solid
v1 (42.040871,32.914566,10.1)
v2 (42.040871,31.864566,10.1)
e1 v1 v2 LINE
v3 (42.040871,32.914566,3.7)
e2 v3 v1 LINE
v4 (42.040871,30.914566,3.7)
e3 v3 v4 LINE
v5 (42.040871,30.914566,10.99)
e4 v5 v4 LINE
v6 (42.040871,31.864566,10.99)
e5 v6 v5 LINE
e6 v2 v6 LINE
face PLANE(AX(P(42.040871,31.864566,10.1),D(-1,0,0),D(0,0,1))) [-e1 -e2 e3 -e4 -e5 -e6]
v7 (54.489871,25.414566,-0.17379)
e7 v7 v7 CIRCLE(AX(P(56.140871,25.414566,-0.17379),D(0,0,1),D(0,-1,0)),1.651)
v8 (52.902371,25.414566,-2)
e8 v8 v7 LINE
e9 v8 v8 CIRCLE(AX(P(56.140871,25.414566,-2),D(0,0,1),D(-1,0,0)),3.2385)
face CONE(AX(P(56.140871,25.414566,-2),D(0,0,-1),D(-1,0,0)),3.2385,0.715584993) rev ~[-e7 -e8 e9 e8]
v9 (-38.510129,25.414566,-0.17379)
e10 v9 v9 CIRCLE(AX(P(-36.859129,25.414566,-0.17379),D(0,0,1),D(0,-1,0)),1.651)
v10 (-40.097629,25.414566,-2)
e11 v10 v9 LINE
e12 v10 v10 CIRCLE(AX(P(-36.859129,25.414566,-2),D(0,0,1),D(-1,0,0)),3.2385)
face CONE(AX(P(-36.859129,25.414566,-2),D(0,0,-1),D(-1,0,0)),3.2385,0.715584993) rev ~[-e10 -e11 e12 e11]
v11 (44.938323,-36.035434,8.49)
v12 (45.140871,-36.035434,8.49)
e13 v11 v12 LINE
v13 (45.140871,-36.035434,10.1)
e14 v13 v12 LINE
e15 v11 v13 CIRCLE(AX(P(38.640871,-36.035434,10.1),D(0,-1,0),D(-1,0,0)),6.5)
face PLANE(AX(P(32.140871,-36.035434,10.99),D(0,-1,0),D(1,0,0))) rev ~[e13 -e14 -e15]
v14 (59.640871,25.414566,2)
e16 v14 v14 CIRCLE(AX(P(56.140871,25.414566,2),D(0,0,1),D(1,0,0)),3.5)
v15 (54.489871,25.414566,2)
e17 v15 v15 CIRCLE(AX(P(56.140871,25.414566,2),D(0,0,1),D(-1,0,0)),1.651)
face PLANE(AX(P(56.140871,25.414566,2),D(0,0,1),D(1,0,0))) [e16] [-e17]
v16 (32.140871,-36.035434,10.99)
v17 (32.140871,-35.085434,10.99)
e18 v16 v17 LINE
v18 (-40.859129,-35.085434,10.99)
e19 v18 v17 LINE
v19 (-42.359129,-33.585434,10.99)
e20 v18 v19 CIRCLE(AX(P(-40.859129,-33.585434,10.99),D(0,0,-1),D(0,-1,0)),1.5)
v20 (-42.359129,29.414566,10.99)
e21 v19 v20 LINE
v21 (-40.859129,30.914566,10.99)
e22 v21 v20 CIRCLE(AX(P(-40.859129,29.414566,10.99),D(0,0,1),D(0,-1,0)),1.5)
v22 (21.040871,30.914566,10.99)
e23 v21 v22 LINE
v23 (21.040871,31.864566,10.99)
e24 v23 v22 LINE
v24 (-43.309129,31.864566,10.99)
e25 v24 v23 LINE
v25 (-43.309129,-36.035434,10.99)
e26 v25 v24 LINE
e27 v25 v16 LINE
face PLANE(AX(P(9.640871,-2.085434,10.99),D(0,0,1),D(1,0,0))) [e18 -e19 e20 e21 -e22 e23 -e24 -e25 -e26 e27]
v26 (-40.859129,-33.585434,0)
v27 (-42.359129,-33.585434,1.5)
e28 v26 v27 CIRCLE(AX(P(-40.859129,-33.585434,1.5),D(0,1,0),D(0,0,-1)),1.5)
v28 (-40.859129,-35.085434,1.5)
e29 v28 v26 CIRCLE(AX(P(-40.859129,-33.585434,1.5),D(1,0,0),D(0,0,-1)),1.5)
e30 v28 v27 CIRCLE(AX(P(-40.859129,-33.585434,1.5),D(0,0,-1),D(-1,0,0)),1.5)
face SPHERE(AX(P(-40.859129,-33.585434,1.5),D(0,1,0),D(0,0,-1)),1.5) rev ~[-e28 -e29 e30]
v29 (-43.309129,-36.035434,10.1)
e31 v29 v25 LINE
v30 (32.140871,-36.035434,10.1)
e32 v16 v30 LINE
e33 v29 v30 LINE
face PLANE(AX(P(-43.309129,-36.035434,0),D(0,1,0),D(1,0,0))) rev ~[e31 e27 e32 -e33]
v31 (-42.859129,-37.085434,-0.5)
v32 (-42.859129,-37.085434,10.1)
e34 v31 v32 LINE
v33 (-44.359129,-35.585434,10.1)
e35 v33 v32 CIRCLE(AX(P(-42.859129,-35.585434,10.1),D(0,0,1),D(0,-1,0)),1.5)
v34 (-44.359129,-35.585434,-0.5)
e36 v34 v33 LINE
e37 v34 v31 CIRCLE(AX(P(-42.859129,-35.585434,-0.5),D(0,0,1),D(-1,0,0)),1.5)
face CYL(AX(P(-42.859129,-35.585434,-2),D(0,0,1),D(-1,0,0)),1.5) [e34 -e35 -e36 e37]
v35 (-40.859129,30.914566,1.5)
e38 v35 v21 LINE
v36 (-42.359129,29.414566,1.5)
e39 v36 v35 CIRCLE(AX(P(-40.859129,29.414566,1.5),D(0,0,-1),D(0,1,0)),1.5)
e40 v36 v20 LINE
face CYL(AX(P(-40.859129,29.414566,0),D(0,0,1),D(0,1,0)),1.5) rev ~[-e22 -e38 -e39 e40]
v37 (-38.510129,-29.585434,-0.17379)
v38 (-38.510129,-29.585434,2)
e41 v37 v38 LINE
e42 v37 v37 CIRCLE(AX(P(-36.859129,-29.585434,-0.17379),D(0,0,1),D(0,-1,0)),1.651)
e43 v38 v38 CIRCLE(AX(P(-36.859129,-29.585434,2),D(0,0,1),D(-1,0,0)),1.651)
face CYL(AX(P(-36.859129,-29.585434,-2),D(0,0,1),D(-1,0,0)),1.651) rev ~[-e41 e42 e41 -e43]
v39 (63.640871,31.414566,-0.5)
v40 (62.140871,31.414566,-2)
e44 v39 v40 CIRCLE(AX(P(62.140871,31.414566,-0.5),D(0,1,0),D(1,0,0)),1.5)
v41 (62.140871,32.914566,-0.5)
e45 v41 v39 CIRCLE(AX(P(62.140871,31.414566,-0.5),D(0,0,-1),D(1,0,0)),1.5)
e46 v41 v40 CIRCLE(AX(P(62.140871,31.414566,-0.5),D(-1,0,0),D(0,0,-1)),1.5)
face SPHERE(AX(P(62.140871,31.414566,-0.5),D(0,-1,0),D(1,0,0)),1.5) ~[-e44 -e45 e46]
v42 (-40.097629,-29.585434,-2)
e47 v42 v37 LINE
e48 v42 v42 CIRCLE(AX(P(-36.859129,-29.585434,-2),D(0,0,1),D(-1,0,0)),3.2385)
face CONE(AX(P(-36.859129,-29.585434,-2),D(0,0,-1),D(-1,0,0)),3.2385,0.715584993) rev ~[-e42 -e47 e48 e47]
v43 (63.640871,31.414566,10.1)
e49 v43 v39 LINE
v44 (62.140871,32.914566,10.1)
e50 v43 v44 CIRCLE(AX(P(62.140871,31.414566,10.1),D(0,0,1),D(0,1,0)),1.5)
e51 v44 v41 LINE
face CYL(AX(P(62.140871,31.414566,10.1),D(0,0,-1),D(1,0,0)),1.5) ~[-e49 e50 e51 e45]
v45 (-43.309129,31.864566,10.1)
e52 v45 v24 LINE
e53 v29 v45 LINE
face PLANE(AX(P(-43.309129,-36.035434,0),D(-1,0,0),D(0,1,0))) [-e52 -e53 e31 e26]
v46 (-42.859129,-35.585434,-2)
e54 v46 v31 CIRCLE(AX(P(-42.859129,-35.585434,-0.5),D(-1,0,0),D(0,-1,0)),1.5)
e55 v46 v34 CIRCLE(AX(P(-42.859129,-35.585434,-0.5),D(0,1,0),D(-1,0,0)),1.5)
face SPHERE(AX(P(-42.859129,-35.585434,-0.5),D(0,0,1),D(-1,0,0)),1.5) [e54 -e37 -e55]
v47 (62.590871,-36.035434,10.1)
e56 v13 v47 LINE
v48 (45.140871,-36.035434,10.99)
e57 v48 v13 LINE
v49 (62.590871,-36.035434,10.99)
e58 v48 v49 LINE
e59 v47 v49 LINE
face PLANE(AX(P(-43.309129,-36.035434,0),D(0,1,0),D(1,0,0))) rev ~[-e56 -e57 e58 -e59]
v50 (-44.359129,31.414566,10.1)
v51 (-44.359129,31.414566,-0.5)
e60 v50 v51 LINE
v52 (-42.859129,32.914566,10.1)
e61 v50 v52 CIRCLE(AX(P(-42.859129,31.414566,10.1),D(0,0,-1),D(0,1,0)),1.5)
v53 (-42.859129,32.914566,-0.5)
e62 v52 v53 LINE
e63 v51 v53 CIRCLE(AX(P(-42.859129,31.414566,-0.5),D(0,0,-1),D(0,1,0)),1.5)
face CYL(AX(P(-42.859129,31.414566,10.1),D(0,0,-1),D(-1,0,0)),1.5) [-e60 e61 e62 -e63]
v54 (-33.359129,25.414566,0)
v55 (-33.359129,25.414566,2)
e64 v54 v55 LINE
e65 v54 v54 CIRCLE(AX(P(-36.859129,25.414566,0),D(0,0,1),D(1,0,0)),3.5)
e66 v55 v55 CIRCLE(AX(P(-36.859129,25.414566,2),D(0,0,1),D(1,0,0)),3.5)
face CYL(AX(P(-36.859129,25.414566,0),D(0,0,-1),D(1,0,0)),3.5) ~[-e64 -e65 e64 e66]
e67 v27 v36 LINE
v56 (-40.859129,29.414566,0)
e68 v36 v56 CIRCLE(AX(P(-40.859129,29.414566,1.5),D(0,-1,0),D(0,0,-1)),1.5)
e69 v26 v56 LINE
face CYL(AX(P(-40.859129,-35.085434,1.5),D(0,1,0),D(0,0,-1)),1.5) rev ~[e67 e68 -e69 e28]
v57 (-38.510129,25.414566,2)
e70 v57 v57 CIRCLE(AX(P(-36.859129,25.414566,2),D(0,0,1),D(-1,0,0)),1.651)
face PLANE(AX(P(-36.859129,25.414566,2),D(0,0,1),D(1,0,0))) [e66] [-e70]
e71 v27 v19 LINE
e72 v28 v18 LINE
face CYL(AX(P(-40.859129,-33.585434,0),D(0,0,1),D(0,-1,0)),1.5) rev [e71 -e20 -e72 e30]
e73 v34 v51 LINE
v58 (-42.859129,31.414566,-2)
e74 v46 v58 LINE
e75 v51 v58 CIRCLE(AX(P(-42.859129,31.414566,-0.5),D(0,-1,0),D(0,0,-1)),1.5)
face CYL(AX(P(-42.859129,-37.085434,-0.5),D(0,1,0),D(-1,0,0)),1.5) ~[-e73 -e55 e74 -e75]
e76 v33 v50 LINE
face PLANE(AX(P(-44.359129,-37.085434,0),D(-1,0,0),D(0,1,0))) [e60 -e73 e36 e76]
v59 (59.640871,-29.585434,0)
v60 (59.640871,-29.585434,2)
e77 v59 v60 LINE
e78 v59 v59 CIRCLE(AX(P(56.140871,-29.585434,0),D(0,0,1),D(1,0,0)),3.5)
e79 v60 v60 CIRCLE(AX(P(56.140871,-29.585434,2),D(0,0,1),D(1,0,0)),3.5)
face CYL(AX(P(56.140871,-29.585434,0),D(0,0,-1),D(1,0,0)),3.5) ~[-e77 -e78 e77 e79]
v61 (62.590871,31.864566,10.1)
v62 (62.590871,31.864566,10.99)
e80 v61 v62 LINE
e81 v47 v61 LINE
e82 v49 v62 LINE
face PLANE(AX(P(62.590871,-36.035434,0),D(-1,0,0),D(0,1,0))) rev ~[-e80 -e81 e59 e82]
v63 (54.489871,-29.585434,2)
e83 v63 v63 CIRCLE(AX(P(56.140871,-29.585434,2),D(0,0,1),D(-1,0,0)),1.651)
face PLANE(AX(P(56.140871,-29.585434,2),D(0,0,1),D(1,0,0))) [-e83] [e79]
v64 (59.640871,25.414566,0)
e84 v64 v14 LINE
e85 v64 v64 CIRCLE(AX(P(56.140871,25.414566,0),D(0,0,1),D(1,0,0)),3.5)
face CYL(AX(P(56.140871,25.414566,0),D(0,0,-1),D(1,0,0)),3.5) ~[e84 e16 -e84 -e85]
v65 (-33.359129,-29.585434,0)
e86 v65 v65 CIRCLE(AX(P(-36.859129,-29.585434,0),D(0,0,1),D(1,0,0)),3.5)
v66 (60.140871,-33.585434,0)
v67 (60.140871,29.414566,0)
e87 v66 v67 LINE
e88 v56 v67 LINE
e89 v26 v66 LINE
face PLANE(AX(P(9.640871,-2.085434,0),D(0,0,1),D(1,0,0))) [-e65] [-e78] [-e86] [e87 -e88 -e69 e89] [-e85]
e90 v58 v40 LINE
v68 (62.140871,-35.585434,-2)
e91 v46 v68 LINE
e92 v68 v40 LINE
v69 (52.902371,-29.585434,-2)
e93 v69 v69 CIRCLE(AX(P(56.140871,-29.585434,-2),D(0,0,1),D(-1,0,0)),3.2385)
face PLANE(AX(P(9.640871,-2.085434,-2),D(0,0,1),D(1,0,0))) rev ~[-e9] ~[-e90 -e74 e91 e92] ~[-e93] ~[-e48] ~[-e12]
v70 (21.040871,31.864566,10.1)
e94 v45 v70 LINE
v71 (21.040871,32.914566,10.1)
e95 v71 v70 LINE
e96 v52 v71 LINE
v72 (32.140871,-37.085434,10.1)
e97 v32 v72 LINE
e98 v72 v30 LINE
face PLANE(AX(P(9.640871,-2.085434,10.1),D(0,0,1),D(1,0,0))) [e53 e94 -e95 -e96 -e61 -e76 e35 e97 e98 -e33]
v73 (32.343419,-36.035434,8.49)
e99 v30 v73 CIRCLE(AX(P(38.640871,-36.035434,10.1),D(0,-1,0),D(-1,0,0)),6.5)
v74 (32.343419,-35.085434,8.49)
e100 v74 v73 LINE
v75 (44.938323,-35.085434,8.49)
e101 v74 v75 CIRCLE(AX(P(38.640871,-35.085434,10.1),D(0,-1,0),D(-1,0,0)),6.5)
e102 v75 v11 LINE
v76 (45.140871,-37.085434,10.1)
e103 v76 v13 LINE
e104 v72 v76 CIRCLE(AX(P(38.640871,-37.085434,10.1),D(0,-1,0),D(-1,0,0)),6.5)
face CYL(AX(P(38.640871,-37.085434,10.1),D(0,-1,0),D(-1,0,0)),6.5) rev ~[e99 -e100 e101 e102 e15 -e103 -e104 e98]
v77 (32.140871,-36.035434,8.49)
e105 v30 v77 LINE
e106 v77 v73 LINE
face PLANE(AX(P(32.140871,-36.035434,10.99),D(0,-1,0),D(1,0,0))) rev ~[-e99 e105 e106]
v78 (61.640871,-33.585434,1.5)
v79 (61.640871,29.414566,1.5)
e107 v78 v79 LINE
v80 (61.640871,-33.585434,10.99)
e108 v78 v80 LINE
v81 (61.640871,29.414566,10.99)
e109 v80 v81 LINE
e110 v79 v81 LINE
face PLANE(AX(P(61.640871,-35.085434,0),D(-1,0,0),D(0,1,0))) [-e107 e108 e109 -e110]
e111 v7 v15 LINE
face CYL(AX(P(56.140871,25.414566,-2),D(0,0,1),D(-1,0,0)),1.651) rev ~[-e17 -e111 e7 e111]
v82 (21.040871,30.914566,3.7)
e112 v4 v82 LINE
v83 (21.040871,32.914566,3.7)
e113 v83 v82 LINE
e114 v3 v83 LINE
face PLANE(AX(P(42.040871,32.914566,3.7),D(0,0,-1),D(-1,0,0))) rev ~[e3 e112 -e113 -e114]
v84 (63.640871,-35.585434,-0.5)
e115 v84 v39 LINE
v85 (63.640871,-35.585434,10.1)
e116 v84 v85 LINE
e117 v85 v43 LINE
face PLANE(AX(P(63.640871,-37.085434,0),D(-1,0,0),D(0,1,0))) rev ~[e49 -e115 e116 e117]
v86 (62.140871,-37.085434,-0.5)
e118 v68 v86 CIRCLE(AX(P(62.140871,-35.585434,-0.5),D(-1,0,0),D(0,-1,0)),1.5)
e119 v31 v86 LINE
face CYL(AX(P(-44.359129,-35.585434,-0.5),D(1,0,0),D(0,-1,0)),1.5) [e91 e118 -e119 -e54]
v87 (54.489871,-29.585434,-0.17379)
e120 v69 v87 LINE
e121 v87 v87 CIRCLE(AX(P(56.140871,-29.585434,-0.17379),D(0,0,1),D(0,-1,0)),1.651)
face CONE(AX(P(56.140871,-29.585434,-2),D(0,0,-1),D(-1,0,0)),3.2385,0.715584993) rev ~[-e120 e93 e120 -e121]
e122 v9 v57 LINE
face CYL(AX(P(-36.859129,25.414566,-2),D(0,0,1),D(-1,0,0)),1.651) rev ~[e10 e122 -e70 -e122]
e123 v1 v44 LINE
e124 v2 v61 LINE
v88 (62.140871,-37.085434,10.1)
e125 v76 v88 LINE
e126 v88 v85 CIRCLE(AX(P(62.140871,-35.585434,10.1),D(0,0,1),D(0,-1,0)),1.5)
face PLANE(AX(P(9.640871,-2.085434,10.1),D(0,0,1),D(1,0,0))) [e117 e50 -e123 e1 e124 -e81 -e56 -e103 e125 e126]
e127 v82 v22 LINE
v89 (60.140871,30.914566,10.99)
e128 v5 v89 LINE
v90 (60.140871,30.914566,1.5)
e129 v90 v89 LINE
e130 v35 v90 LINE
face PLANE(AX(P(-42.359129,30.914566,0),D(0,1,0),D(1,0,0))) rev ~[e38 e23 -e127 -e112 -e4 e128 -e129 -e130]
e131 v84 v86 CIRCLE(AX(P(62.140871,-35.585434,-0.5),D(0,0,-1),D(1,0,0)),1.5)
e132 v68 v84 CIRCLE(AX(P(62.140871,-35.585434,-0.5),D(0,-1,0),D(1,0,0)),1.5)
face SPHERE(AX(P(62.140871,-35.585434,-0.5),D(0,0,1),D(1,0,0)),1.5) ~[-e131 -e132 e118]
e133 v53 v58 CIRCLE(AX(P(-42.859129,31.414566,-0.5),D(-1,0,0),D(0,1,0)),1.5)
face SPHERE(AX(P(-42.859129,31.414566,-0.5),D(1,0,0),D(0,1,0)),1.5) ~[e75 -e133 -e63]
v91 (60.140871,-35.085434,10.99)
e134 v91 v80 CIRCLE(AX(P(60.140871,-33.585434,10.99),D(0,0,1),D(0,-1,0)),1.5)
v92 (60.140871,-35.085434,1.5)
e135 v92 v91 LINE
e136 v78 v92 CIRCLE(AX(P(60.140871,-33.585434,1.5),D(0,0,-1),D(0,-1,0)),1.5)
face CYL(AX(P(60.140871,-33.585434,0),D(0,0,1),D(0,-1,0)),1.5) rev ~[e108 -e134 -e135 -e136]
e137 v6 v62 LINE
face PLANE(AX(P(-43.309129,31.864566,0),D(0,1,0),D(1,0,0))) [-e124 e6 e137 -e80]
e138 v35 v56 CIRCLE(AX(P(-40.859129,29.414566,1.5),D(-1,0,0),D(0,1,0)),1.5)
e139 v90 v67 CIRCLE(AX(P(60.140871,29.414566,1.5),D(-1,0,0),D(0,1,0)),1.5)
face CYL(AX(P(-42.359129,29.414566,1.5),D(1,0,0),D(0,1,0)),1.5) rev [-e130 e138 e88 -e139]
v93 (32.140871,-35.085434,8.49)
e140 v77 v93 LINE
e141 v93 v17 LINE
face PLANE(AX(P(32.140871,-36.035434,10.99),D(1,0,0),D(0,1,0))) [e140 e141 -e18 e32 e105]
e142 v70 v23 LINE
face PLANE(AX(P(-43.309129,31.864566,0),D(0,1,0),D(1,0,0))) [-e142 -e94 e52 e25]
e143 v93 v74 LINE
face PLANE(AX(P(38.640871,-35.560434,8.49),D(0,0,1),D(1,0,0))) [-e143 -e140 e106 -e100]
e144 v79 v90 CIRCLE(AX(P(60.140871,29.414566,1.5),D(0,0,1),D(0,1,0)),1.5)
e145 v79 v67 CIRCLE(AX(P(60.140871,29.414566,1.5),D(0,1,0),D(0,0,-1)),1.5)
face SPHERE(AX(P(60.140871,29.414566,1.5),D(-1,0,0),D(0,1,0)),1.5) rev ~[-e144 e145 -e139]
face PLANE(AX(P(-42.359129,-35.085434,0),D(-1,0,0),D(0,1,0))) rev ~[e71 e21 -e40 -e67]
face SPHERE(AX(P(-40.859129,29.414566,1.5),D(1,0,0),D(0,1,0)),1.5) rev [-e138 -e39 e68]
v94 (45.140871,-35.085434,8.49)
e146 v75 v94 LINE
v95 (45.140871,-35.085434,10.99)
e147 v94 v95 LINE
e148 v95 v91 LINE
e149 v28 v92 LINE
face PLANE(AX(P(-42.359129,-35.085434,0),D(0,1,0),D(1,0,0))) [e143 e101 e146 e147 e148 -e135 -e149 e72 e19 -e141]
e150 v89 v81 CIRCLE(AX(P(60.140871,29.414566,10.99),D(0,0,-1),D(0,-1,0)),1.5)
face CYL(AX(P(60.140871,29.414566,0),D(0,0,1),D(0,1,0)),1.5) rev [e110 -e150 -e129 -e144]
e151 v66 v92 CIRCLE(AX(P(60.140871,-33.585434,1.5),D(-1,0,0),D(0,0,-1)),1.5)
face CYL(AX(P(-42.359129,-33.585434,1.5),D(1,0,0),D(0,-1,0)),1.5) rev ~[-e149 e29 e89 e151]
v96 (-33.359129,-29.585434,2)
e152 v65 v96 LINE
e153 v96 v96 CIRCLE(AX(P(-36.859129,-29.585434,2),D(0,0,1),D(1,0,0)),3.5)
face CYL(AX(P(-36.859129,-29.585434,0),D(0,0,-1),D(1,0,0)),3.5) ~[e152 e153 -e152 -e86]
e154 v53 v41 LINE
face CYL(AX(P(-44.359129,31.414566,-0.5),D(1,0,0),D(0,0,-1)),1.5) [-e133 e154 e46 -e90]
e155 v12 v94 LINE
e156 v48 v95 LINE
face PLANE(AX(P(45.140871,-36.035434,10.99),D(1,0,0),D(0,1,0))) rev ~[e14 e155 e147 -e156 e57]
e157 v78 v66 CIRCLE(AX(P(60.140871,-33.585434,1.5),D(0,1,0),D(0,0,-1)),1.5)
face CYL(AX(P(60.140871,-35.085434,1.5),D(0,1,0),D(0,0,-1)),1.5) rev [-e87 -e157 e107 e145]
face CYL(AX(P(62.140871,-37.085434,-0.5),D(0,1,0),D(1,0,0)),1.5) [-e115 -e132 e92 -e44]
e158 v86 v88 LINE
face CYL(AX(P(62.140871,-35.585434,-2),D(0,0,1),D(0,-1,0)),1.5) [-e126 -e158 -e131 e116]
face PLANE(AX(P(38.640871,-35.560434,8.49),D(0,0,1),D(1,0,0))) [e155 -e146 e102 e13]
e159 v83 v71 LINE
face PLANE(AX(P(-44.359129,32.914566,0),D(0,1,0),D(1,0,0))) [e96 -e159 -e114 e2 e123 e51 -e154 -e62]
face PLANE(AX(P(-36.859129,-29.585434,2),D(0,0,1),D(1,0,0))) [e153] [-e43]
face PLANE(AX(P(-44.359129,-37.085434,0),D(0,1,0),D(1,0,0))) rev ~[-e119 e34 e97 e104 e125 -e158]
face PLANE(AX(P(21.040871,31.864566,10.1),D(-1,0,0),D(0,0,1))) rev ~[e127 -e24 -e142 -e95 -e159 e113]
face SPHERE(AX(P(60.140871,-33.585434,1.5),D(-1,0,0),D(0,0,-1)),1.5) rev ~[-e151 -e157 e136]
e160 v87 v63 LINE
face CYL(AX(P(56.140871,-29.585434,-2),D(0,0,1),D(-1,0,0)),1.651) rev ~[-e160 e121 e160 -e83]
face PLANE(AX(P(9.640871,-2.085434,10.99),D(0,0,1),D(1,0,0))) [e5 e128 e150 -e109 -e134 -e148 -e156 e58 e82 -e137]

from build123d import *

# Parameters (mm, degrees)
F0_W           = 108
F0_H           = 70
F0_W_2         = 105.9
F0_H_2         = 67.9
F0_W_3         = 104
F0_H_3         = 66
F0_R           = 3
F1_DEPTH       = 2
F2_DEPTH       = 10.99
F3_DEPTH       = 10.1
F4_R           = 3.5
F5_DEPTH       = 2
F7_D           = 3.302
F7_CSINK_D     = 6.477
F7_CSINK_ANGLE = 82
F8_W           = 21
F8_H           = 6.4
F9_DEPTH       = 2.5
F10_W          = 13
F10_H          = 0.95
F11_DEPTH      = 2.5
F13_DEPTH      = 2.5
F14_R          = 1.5
F15_R          = 1.5
F16_W          = 21
F16_H          = 0.89
F17_DEPTH      = 2.5


# Not quite as in the source:
# - a feature names something its author has since deleted; it is built from what else it names


with BuildPart() as f1:
    # F0 (on Top) → F1 (new body)
    with BuildSketch(Plane.XY):
        with Locations((9.6408709802, -2.0854342729)):
            Rectangle(F0_W, F0_H)
        with Locations((9.6408709802, -2.0854342729)):
            Rectangle(F0_W_2, F0_H_2, mode=Mode.SUBTRACT)
        with Locations((9.6408709802, -2.0854342729)):
            Rectangle(F0_W_2, F0_H_2)
        with Locations((9.6408709802, -2.0854342729)):
            Rectangle(F0_W_3, F0_H_3, mode=Mode.SUBTRACT)
        with Locations((9.6408709802, -2.0854342729)):
            Rectangle(F0_W_3, F0_H_3)
        with Locations((-36.8591290198, -29.5854342729)):
            Circle(F0_R, mode=Mode.SUBTRACT)
        with Locations((54.9200624228, -29.5854342729)):
            Circle(F0_R, mode=Mode.SUBTRACT)
        with Locations((-36.8591290198, 25.4145657271)):
            Circle(F0_R, mode=Mode.SUBTRACT)
        with Locations((57.1408709802, 25.4145657271)):
            Circle(F0_R, mode=Mode.SUBTRACT)
        with Locations((-36.8591290198, -29.5854342729)):
            Circle(F0_R)
        with Locations((54.9200624228, -29.5854342729)):
            Circle(F0_R)
        with Locations((-36.8591290198, 25.4145657271)):
            Circle(F0_R)
        with Locations((57.1408709802, 25.4145657271)):
            Circle(F0_R)
    extrude(amount=-F1_DEPTH)

    # F0 (on Top) → F2 (join)
    with BuildSketch(Plane.XY):
        with Locations((9.6408709802, -2.0854342729)):
            Rectangle(F0_W_2, F0_H_2)
        with Locations((9.6408709802, -2.0854342729)):
            Rectangle(F0_W_3, F0_H_3, mode=Mode.SUBTRACT)
    extrude(amount=F2_DEPTH)

    # F0 (on Top) → F3 (join)
    with BuildSketch(Plane.XY):
        with Locations((9.6408709802, -2.0854342729)):
            Rectangle(F0_W, F0_H)
        with Locations((9.6408709802, -2.0854342729)):
            Rectangle(F0_W_2, F0_H_2, mode=Mode.SUBTRACT)
    extrude(amount=F3_DEPTH)

    # F4 (on face) → F5 (join)
    with BuildSketch(Plane.XY):
        with Locations((-36.8591290198, 25.4145657271)):
            Circle(F4_R)
        with Locations((56.1408709802, 25.4145657271)):
            Circle(F4_R)
        with Locations((56.1408709802, -29.5854342729)):
            Circle(F4_R)
        with Locations((-36.8591290198, -29.5854342729)):
            Circle(F4_R)
    extrude(amount=F5_DEPTH)

    # F7 (through all)
    with Locations(Plane(origin=(0, 0, -2), x_dir=(1, 0, 0), z_dir=(0, 0, -1))):
        with Locations((-36.8591290198, 29.5854342729), (56.1408709802, 29.5854342729), (56.1408709802, -25.4145657271), (-36.8591290198, -25.4145657271)):
            CounterSinkHole(F7_D / 2, F7_CSINK_D / 2, counter_sink_angle=F7_CSINK_ANGLE)

    # F8 (on face) → F9 (cut)
    with BuildSketch(Plane(origin=(0, 32.9145657271, 0), x_dir=(-1, 0, 0), z_dir=(0, 1, 0))):
        with Locations((-31.5408709802, 6.9)):
            Rectangle(F8_W, F8_H)
    extrude(amount=-F9_DEPTH, mode=Mode.SUBTRACT)

    # F10 (on face) → F11 (cut)
    with BuildSketch(Plane.XY.offset(10.99)):
        with Locations((38.6408709802, -35.5604342729)):
            Rectangle(F10_W, F10_H)
    extrude(amount=-F11_DEPTH, mode=Mode.SUBTRACT)

    # F12 (on face) → F13 (cut)
    with BuildSketch(Plane.XZ.offset(37.0854342729)):
        with BuildLine():
            ThreePointArc((32.1408709802, 10.1), (38.6408709802, 3.6), (45.1408709802, 10.1))
            Line((45.1408709802, 10.1), (32.1408709802, 10.1))
        make_face()
    extrude(amount=-F13_DEPTH, mode=Mode.SUBTRACT)

    # F14
    f14_edges = [f1.edges().sort_by_distance(p)[0] for p in [
        (63.640871, -37.085434, 4.05),
        (63.640871, -2.085434, -2),
        (63.640871, 32.914566, 4.05),
        (9.640871, 32.914566, -2),
        (-44.359129, 32.914566, 4.05),
        (-44.359129, -37.085434, 4.05),
        (-44.359129, -2.085434, -2),
        (9.640871, -37.085434, -2),
    ]]
    fillet(f14_edges, radius=F14_R)

    # F15
    f15_edges = [f1.edges().sort_by_distance(p)[0] for p in [
        (9.640871, 30.914566, 0),
        (-42.359129, 30.914566, 5.495),
        (-42.359129, -2.085434, 0),
        (9.640871, -35.085434, 0),
        (-42.359129, -35.085434, 5.495),
        (61.640871, 30.914566, 5.495),
        (61.640871, -2.085434, 0),
        (61.640871, -35.085434, 5.495),
    ]]
    fillet(f15_edges, radius=F15_R)

    # F16 (on face) → F17 (cut)
    with BuildSketch(Plane(origin=(0, 31.8645657271, 0), x_dir=(-1, 0, 0), z_dir=(0, 1, 0))):
        with Locations((-31.5408709802, 10.545)):
            Rectangle(F16_W, F16_H)
    extrude(amount=-F17_DEPTH, mode=Mode.SUBTRACT)


solid = f1.part
